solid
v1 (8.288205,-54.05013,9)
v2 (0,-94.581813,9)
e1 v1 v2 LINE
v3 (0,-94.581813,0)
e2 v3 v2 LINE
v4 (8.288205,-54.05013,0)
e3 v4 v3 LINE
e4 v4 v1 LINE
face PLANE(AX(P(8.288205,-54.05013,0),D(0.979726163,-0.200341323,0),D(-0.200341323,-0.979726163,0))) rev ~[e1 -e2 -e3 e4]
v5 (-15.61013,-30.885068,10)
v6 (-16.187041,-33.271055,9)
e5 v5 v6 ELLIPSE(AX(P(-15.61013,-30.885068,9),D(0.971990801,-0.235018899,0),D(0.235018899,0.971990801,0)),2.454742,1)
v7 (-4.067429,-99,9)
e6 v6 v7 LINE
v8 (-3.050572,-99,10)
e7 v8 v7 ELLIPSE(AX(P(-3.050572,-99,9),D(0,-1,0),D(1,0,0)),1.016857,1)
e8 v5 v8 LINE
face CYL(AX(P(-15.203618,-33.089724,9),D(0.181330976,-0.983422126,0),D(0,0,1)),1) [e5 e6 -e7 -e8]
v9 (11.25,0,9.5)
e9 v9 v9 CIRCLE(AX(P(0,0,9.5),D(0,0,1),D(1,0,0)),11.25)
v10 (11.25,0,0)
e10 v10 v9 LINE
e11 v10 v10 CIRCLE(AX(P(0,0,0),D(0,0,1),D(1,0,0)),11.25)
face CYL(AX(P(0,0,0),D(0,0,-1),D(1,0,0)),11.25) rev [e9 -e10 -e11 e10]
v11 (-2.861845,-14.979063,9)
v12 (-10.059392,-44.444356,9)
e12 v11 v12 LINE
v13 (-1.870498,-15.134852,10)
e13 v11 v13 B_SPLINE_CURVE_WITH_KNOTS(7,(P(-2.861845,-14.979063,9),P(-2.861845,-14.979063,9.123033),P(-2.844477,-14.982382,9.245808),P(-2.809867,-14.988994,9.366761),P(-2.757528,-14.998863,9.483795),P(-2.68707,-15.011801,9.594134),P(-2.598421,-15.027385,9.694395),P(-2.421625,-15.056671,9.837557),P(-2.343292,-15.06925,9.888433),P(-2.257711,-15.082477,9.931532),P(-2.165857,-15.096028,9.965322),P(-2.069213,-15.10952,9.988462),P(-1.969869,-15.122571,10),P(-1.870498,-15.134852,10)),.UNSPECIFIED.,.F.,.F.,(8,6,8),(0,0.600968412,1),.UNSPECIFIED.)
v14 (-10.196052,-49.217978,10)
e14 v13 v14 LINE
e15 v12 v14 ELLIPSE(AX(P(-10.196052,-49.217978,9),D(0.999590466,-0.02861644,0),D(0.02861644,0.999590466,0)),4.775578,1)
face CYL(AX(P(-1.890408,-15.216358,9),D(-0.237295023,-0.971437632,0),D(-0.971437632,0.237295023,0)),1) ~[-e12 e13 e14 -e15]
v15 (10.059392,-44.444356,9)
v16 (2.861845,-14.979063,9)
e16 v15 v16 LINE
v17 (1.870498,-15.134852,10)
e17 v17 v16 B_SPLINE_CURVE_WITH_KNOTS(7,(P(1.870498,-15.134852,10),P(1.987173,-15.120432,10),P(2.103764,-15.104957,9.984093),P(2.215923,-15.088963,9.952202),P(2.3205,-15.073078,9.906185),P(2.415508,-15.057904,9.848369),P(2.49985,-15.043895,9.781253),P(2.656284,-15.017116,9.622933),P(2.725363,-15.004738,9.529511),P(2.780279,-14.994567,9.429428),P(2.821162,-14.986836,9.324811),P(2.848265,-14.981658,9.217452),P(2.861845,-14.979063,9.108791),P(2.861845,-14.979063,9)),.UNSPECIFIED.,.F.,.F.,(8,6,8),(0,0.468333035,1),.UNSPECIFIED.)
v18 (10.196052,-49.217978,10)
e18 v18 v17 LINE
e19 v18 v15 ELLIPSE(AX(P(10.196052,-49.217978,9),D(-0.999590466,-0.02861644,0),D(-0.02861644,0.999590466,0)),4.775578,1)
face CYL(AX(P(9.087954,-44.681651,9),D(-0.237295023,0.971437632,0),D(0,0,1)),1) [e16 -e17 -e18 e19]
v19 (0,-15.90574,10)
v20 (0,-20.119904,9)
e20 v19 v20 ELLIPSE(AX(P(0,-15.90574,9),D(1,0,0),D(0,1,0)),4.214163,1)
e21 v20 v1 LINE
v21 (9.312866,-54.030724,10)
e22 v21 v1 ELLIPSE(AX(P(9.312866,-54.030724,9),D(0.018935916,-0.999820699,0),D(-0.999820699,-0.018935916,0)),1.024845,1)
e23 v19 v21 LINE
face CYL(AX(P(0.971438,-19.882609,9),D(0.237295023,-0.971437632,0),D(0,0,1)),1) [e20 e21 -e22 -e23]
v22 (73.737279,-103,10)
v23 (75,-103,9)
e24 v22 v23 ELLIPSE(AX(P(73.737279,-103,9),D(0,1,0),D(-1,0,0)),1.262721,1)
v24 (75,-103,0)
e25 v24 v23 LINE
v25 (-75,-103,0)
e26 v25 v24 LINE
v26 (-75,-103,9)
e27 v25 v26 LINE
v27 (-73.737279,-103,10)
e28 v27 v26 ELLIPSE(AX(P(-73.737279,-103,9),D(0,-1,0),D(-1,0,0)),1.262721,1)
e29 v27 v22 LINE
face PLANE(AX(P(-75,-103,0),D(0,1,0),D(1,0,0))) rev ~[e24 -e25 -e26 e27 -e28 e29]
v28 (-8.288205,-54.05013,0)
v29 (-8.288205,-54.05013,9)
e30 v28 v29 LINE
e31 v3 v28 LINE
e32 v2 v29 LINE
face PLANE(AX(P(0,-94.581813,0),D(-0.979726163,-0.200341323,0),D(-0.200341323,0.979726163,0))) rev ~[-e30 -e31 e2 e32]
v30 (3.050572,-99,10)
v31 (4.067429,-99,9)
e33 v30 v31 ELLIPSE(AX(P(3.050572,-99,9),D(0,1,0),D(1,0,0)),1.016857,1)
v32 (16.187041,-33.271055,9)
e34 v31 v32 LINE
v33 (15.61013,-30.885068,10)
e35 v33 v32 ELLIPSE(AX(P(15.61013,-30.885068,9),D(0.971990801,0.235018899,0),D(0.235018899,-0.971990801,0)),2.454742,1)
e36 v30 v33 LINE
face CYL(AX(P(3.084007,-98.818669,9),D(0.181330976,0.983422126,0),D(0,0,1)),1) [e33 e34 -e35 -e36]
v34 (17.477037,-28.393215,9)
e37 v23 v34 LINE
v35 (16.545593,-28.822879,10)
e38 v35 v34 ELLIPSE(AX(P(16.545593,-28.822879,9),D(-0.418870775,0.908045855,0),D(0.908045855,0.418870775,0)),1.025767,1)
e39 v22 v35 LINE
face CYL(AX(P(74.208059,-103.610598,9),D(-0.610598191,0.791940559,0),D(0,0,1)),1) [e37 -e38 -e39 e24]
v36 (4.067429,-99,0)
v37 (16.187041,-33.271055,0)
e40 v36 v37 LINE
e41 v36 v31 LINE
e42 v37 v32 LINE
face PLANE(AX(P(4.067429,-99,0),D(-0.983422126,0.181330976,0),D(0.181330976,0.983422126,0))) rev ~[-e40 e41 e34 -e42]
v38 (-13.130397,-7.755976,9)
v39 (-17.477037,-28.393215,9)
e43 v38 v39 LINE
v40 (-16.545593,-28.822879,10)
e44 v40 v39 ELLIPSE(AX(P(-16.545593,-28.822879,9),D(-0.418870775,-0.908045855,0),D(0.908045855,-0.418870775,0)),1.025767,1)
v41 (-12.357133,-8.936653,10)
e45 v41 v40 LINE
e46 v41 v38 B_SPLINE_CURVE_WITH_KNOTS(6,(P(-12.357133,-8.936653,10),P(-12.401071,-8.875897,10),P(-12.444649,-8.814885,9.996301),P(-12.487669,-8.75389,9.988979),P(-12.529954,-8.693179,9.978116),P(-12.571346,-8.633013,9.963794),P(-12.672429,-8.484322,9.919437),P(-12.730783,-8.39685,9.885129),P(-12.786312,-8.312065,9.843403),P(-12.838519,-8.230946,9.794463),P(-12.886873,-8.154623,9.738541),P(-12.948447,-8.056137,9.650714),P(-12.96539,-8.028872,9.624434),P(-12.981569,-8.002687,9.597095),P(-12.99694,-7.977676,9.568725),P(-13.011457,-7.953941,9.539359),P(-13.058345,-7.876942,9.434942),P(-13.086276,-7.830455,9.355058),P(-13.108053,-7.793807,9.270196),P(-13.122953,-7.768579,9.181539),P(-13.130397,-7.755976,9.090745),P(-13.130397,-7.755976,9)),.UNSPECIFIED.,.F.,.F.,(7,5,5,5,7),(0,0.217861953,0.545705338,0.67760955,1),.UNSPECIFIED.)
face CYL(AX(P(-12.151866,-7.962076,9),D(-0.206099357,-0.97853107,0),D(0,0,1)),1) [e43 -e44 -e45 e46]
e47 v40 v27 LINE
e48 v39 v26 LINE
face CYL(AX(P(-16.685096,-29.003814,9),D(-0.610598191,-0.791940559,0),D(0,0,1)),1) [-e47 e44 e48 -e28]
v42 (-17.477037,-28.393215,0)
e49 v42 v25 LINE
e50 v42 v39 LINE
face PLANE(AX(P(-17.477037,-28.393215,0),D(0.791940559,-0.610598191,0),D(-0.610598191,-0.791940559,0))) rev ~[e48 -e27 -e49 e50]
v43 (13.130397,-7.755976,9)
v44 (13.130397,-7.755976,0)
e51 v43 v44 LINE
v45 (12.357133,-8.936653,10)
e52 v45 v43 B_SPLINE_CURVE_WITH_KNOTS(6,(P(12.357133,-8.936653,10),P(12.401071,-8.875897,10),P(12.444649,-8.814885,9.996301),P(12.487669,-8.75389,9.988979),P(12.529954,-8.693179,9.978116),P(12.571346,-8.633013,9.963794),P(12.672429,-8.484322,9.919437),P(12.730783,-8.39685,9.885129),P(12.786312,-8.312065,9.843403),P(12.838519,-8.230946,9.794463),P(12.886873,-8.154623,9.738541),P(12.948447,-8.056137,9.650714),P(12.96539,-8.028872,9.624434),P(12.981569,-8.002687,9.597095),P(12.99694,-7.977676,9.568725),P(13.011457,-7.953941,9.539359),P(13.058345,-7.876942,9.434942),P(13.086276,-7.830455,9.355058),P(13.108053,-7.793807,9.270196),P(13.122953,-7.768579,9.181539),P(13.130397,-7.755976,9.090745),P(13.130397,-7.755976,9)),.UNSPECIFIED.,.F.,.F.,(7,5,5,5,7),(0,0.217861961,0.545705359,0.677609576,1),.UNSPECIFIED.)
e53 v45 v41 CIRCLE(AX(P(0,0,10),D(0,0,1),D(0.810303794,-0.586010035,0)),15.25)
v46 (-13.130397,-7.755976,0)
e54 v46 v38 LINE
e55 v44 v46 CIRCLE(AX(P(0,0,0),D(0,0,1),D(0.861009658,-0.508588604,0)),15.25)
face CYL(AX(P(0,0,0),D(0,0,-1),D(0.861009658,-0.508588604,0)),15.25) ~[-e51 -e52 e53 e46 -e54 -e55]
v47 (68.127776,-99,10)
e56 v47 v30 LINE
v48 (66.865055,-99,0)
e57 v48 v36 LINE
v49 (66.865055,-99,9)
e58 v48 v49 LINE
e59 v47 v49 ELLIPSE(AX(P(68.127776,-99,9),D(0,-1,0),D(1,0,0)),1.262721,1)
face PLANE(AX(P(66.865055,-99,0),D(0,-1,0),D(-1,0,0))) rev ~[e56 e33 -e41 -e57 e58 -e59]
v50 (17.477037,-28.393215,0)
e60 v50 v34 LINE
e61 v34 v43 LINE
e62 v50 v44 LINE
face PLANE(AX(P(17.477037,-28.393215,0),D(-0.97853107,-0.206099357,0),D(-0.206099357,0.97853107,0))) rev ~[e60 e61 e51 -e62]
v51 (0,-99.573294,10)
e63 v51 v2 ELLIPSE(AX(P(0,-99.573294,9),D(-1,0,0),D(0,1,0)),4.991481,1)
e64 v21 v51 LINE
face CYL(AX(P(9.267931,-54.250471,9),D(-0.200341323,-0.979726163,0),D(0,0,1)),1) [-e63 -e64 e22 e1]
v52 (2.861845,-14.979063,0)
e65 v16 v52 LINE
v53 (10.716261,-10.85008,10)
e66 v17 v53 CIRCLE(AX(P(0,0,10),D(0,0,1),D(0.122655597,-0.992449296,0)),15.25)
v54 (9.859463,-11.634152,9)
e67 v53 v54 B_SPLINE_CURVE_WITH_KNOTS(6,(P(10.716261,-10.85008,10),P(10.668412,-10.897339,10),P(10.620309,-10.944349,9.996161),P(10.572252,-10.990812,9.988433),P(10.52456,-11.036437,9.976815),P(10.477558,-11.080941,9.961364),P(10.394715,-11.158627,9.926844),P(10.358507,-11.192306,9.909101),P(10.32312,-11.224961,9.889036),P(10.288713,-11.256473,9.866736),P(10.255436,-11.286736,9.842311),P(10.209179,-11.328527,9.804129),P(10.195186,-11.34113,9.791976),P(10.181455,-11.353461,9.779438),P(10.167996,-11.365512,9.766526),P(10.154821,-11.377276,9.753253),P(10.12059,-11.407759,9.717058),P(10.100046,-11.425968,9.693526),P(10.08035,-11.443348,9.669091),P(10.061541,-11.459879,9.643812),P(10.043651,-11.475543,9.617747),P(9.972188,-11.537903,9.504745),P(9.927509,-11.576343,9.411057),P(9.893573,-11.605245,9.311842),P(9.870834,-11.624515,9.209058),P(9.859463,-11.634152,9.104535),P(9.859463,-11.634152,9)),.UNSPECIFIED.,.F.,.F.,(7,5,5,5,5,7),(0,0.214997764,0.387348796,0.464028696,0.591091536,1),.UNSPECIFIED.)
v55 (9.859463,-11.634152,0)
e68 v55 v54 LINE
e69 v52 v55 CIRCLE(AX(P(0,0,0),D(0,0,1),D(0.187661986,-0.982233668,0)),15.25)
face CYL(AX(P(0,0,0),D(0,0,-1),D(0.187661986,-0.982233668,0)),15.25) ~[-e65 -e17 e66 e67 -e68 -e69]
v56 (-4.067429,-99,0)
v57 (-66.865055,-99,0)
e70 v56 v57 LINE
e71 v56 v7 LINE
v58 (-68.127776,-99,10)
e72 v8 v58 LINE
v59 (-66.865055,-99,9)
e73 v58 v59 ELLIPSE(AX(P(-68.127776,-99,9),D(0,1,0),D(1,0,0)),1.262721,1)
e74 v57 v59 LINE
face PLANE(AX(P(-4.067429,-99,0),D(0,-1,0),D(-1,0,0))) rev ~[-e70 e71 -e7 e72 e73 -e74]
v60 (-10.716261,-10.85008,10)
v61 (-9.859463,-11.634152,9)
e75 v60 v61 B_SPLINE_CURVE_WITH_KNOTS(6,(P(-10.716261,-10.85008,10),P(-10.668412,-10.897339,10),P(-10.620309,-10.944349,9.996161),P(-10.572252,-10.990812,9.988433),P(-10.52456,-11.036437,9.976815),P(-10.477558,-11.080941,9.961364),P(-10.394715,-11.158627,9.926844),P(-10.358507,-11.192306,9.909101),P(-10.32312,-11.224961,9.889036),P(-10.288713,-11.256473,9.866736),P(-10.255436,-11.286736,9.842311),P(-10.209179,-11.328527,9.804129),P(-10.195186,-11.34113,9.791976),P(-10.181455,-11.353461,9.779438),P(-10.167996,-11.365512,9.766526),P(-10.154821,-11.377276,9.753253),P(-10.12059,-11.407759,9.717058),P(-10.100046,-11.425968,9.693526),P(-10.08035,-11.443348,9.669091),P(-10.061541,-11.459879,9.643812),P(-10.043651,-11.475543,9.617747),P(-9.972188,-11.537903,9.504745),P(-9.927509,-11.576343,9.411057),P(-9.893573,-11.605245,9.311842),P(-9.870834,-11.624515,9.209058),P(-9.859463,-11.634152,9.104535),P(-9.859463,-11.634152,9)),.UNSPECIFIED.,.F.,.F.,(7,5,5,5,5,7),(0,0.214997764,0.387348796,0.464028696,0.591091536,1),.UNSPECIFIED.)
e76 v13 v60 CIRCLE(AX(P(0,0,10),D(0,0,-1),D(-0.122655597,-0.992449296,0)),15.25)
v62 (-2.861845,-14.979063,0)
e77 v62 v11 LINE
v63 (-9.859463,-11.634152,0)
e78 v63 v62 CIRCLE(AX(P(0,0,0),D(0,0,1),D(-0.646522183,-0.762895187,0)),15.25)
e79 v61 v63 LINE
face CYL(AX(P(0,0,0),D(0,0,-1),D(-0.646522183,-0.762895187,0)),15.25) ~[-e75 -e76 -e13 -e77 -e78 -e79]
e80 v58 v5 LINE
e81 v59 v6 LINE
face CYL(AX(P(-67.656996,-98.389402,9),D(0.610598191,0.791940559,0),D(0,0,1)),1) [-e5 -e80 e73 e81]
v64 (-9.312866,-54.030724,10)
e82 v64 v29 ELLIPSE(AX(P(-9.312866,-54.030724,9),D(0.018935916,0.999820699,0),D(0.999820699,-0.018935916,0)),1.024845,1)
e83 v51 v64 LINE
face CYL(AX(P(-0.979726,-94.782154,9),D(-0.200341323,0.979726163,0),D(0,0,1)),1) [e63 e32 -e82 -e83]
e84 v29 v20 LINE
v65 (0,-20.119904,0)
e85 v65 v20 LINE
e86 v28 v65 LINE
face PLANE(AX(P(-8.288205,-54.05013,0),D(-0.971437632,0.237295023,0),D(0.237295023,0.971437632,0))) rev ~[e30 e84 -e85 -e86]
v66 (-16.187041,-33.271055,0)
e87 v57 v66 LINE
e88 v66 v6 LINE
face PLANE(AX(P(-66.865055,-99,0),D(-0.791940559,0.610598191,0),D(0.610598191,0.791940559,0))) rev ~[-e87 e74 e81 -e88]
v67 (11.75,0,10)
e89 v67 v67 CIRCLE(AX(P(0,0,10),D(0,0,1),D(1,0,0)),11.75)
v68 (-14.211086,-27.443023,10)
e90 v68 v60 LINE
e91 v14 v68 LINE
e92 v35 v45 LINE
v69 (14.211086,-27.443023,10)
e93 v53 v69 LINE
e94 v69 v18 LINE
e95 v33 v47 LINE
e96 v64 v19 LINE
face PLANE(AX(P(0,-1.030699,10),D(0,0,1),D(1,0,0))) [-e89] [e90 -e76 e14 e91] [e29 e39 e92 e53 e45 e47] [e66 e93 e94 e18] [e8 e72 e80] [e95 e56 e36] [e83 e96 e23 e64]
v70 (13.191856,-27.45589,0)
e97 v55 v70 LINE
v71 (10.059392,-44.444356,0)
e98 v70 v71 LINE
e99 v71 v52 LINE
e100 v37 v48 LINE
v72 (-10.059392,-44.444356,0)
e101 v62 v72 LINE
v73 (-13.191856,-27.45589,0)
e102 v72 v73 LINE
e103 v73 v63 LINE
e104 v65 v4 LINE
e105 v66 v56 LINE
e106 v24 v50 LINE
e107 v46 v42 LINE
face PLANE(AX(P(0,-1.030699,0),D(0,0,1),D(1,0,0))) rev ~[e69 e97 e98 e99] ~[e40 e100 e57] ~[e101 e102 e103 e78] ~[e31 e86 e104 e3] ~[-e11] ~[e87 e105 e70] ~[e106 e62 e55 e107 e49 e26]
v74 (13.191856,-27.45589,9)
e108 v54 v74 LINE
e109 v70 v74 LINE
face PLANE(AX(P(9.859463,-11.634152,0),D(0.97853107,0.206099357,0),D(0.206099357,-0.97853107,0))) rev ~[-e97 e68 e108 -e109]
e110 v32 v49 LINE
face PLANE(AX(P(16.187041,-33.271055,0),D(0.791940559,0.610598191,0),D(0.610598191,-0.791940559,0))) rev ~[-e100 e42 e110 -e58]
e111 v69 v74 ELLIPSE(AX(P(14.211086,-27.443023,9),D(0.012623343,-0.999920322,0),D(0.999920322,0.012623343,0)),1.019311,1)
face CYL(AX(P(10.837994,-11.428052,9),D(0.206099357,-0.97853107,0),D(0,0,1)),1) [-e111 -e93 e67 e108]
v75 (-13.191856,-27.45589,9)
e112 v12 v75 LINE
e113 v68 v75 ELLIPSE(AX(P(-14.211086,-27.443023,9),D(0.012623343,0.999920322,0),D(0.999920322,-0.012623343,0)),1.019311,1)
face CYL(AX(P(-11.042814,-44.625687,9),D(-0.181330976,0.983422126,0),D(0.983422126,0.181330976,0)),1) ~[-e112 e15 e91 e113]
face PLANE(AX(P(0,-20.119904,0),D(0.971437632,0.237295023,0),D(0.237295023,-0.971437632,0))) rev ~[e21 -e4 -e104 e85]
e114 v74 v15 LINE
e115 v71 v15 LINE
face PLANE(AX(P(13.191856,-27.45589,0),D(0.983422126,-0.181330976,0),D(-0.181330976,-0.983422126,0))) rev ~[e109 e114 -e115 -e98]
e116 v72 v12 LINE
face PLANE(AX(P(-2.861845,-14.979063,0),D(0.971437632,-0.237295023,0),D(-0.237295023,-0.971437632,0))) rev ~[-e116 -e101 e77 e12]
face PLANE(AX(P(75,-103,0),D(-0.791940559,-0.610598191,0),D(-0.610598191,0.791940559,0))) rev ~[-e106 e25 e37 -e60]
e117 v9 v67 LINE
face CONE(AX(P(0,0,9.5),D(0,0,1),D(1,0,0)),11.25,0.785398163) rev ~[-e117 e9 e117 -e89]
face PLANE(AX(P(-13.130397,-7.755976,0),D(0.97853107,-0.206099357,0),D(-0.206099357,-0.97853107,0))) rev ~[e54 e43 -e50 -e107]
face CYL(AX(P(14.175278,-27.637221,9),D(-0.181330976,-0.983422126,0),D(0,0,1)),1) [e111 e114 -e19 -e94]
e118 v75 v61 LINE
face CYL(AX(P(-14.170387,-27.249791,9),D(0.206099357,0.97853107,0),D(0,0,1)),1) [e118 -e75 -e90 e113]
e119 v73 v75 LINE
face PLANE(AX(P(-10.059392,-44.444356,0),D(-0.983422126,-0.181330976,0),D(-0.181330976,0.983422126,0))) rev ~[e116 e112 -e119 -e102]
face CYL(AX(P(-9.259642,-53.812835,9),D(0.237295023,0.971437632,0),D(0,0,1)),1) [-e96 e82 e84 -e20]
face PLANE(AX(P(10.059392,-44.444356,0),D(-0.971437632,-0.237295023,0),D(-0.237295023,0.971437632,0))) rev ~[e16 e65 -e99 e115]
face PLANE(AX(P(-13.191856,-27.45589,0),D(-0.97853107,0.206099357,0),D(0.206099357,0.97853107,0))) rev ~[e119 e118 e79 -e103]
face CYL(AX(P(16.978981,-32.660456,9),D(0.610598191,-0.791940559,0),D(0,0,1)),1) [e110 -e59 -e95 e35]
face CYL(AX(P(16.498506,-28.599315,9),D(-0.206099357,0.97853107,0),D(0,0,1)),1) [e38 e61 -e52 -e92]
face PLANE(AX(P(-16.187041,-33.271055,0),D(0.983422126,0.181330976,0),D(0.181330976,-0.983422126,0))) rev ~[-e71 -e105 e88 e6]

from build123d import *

# Parameters (mm, degrees)
F0_R     = 11.25
F1_DEPTH = 10
F2_DEPTH = 7.1
F3_R     = 1
F5_SIZE  = 0.5


# Not quite as in the source:
# - two fillets or chamfers of one size are made in one step
# - a feature names something its author has since deleted; it is built from what else it names


with BuildPart() as f1:
    # F0 (on Top) → F1 (new body)
    with BuildSketch(Plane.XY):
        with BuildLine():
            ThreePointArc((-2.8618452925, -14.9790634394), (0, -15.25), (2.8618452925, -14.9790634394))
            ThreePointArc((2.8618452925, -14.9790634394), (6.5768557716, -13.7589050494), (9.8594632948, -11.6341516037))
            ThreePointArc((9.8594632948, -11.6341516037), (11.6573360398, -9.8320402997), (13.1303972918, -7.7559762093))
            ThreePointArc((13.1303972918, -7.7559762093), (0, 15.25), (-13.1303972918, -7.7559762093))
            ThreePointArc((-13.1303972918, -7.7559762093), (-11.6573360398, -9.8320402997), (-9.8594632948, -11.6341516037))
            ThreePointArc((-9.8594632948, -11.6341516037), (-6.5768557716, -13.7589050494), (-2.8618452925, -14.9790634394))
        make_face()
        Circle(F0_R, mode=Mode.SUBTRACT)
        with BuildLine():
            Line((10.0593915347, -44.4443559719), (2.8618452925, -14.9790634394))
            ThreePointArc((2.8618452925, -14.9790634394), (0, -15.25), (-2.8618452925, -14.9790634394))
            Line((-2.8618452925, -14.9790634394), (-10.0593915347, -44.4443559719))
            Line((-10.0593915347, -44.4443559719), (-13.1918562915, -27.455889859))
            Line((-13.1918562915, -27.455889859), (-9.8594632948, -11.6341516037))
            ThreePointArc((-9.8594632948, -11.6341516037), (-11.6573360398, -9.8320402997), (-13.1303972918, -7.7559762093))
            Line((-13.1303972918, -7.7559762093), (-17.4770367352, -28.3932154638))
            Line((-17.4770367352, -28.3932154638), (-75, -103))
            Line((-75, -103), (75, -103))
            Line((75, -103), (17.4770367352, -28.3932154638))
            Line((17.4770367352, -28.3932154638), (13.1303972918, -7.7559762093))
            ThreePointArc((13.1303972918, -7.7559762093), (11.6573360398, -9.8320402997), (9.8594632948, -11.6341516037))
            Line((9.8594632948, -11.6341516037), (13.1918562915, -27.455889859))
            Line((13.1918562915, -27.455889859), (10.0593915347, -44.4443559719))
        make_face()
        Polygon((-66.8650551594, -99), (-16.187040587, -33.2710545609), (-4.0674293329, -99), align=None, mode=Mode.SUBTRACT)
        Polygon((66.8650551594, -99), (4.0674293329, -99), (16.187040587, -33.2710545609), align=None, mode=Mode.SUBTRACT)
        Polygon((-8.2882046257, -54.0501300567), (0, -20.1199036092), (8.2882046257, -54.0501300567), (0, -94.5818126202), align=None, mode=Mode.SUBTRACT)
    extrude(amount=F1_DEPTH)

    # F0 (on Top) → F2 (join)
    with BuildSketch(Plane.XY):
        with BuildLine():
            ThreePointArc((-2.8618452925, -14.9790634394), (0, -15.25), (2.8618452925, -14.9790634394))
            ThreePointArc((2.8618452925, -14.9790634394), (6.5768557716, -13.7589050494), (9.8594632948, -11.6341516037))
            ThreePointArc((9.8594632948, -11.6341516037), (11.6573360398, -9.8320402997), (13.1303972918, -7.7559762093))
            ThreePointArc((13.1303972918, -7.7559762093), (0, 15.25), (-13.1303972918, -7.7559762093))
            ThreePointArc((-13.1303972918, -7.7559762093), (-11.6573360398, -9.8320402997), (-9.8594632948, -11.6341516037))
            ThreePointArc((-9.8594632948, -11.6341516037), (-6.5768557716, -13.7589050494), (-2.8618452925, -14.9790634394))
        make_face()
        Circle(F0_R, mode=Mode.SUBTRACT)
    extrude(amount=F2_DEPTH)

    # F3
    f3_edges = [f1.edges().sort_by_distance(p)[0] for p in [
        (-15.303717, -18.074596, 10),
        (-11.52566, -19.545021, 10),
        (-11.625624, -35.950123, 10),
        (-46.238518, -65.696608, 10),
        (-41.526048, -66.135527, 10),
        (-10.127235, -66.135527, 10),
        (-6.460618, -29.71171, 10),
        (6.460618, -29.71171, 10),
        (11.52566, -19.545021, 10),
        (11.625624, -35.950123, 10),
        (15.303717, -18.074596, 10),
        (46.238518, -65.696608, 10),
        (41.526048, -66.135527, 10),
        (10.127235, -66.135527, 10),
        (-4.144102, -37.085017, 10),
        (-4.144102, -74.315971, 10),
        (4.144102, -74.315971, 10),
        (4.144102, -37.085017, 10),
    ]]
    fillet(f3_edges, radius=F3_R)

    # F5
    f5_edges = [f1.edges().sort_by_distance(p)[0] for p in [
        (-11.25, 0, 10),
    ]]
    chamfer(f5_edges, length=F5_SIZE)


solid = f1.part
